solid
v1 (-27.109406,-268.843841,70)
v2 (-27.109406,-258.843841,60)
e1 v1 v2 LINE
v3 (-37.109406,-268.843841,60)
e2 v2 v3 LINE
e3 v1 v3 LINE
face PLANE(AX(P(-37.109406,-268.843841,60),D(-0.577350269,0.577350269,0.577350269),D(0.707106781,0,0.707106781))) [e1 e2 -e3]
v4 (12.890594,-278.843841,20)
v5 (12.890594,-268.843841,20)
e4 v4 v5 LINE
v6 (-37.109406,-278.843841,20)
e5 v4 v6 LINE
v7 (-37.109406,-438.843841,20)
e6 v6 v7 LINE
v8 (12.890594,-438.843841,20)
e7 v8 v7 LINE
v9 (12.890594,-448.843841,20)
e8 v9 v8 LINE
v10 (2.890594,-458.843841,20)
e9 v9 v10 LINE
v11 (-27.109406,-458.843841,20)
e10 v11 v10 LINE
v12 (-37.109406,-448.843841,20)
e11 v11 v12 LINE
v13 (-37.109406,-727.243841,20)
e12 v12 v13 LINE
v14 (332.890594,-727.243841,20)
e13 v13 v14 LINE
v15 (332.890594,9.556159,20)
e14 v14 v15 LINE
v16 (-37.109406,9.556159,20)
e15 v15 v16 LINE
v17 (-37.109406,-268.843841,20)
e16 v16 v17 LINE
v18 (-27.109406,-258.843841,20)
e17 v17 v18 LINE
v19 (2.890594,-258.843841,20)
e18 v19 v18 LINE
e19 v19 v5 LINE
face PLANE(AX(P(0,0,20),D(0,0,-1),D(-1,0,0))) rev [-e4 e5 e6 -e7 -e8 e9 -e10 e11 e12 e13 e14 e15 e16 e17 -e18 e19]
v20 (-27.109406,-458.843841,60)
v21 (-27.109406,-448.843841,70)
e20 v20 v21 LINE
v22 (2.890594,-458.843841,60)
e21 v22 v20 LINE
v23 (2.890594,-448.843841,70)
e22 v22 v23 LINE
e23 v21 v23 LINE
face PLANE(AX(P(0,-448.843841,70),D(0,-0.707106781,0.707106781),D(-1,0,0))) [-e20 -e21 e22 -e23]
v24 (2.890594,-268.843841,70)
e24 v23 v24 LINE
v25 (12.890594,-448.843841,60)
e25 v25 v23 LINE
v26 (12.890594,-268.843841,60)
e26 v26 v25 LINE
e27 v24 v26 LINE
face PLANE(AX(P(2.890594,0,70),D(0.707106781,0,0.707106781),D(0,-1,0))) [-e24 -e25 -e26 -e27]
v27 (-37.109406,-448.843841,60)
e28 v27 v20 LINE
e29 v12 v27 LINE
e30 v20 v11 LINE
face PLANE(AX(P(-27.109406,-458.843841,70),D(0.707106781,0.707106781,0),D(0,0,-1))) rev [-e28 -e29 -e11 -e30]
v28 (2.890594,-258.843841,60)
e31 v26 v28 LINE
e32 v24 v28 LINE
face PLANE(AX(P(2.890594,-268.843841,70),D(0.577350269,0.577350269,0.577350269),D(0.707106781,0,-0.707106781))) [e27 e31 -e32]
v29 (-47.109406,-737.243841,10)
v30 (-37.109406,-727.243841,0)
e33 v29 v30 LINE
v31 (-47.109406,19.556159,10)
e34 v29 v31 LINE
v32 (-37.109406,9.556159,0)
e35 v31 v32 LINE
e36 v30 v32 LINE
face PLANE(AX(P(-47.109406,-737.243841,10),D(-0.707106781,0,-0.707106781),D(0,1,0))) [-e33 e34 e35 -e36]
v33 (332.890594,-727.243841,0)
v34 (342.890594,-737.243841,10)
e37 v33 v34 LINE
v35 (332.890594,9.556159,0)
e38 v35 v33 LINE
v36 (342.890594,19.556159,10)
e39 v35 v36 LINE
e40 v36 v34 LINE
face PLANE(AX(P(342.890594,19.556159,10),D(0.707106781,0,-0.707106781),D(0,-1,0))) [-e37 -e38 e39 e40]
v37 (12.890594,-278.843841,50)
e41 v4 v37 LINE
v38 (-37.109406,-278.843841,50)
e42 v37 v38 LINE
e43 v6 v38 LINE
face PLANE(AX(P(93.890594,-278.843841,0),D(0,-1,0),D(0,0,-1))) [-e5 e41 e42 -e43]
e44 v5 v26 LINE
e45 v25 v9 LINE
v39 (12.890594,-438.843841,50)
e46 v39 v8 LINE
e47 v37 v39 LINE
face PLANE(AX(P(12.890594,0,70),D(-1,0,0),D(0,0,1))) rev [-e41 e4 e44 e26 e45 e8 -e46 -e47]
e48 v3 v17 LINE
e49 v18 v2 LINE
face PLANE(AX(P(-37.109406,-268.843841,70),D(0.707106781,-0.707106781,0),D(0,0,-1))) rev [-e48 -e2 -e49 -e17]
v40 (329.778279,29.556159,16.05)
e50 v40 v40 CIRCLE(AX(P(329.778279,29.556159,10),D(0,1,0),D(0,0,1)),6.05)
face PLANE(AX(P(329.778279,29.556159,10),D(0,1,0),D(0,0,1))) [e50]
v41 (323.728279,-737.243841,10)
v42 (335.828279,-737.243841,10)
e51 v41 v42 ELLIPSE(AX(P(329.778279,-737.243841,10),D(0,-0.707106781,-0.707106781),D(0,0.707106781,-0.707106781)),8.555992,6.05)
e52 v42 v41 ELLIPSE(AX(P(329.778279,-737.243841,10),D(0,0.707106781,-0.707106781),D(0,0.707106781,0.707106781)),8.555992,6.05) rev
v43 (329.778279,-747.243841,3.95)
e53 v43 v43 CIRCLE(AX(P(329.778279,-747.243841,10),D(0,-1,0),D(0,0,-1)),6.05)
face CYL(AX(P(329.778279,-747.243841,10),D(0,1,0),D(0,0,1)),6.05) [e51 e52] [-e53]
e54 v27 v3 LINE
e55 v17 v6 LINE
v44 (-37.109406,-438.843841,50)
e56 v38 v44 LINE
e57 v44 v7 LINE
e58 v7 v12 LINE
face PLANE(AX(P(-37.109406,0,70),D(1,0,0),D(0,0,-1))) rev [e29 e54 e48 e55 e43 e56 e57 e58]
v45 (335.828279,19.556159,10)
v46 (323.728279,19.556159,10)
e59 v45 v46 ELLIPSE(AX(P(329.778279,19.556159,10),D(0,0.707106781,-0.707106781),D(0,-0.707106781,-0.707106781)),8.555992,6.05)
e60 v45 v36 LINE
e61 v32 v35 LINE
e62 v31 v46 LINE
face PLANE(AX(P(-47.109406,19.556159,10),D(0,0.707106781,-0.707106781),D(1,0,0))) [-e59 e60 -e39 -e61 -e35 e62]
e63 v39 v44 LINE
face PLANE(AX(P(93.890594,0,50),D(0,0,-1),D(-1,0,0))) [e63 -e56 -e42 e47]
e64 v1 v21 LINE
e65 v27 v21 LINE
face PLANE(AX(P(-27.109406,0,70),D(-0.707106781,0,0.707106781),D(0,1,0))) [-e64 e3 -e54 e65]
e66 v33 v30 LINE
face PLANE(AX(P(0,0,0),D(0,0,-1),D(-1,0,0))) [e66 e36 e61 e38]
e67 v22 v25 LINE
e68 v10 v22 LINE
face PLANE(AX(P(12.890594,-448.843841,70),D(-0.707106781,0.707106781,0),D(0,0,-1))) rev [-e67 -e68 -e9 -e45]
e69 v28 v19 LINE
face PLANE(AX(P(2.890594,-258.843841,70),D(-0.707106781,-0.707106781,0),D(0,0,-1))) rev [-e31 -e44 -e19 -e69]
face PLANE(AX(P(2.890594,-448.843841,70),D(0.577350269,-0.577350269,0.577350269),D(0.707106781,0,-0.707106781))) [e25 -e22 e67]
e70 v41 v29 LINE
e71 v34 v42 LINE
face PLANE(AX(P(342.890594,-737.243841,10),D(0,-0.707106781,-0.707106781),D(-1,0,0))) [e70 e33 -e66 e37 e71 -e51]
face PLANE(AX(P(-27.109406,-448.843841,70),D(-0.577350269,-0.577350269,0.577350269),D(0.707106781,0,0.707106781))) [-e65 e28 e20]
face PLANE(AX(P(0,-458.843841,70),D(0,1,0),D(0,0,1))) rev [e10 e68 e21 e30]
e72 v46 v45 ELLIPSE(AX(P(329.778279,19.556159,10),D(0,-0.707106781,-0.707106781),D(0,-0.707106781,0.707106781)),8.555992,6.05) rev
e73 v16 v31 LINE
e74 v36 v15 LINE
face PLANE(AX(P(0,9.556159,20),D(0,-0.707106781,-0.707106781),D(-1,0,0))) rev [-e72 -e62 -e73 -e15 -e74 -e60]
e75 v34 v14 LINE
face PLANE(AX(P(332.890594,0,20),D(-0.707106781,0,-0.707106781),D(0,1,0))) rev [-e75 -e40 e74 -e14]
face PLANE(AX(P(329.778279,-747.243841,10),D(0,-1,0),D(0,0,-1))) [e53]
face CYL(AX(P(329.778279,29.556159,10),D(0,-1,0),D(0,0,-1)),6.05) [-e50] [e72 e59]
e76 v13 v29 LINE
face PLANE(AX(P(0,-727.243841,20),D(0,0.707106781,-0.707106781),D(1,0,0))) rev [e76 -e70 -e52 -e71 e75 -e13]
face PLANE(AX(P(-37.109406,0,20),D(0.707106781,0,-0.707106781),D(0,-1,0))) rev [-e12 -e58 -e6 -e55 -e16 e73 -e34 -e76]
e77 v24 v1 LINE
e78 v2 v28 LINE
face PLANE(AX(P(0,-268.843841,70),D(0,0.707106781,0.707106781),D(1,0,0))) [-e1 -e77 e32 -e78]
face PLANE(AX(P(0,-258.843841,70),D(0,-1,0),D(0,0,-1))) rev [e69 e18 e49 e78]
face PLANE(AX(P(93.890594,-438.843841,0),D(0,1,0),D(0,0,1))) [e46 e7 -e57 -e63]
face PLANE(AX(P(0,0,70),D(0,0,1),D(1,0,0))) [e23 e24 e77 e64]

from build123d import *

# Parameters (mm, degrees)
SKETCH1_W           = 390
SKETCH1_H           = 756.8
BOSS_EXTRUDE1_DEPTH = 20
SKETCH2_R           = 6.05
BOSS_EXTRUDE2_DEPTH = 10
BOSS_EXTRUDE3_START = 10
SKETCH3_R           = 6.05
BOSS_EXTRUDE3_DEPTH = 10
CHAMFER1_SIZE       = 10
BOSS_EXTRUDE4_DEPTH = 50
SKETCH5_W           = 30
SKETCH5_H           = 160
CUT_EXTRUDE1_DEPTH  = 131
CHAMFER2_SIZE       = 10


with BuildPart() as part:
    # Sketch1 → Boss-Extrude1 (new body)
    with BuildSketch(Plane.XY):
        with Locations((147.890593688, -358.84384058)):
            Rectangle(SKETCH1_W, SKETCH1_H)
    extrude(amount=BOSS_EXTRUDE1_DEPTH)

    # Sketch2 → Boss-Extrude2 (add)
    with BuildSketch(Plane(origin=(0, 19.55615942, 0), x_dir=(1, 0, 0), z_dir=(0, 1, 0))):
        with Locations(Location((329.77827945, -10, 0), (0, 0, 90))):
            Circle(SKETCH2_R)
    extrude(amount=BOSS_EXTRUDE2_DEPTH)

    # Sketch3 → Boss-Extrude3 (add)
    with BuildSketch(Plane.XZ.offset(737.24384058).offset(BOSS_EXTRUDE3_START)):
        with Locations(Location((329.77827945, 10, 0), (0, 0, 270))):
            Circle(SKETCH3_R)
    extrude(amount=-BOSS_EXTRUDE3_DEPTH)

    # Chamfer1
    # the kernel refuses this chamfer: 10 mm, written as the material it takes off along each edge
    with BuildSketch(Plane(origin=(368.607423567, -737.24384058, 0), x_dir=(0, 0.9996219169112968, -0.027495876610586487), z_dir=(-1, 0, 0))) as chamfer1_piece_1_section:
        Polygon((CHAMFER1_SIZE * 0.999621916911, -CHAMFER1_SIZE * 0.0274958766106), (-CHAMFER1_SIZE * 0.0274958766106, -CHAMFER1_SIZE * 0.999621916911), (0, 0), align=None)
    chamfer1_piece_1 = extrude(amount=441.433659759, mode=Mode.PRIVATE)
    chamfer1_piece_1 = chamfer1_piece_1 - Plane(origin=(329.77827945, -733.933944157, 10), x_dir=(0, 0, -1), z_dir=(0, -1, 0)) * Cylinder(6.05, 923, mode=Mode.PRIVATE)
    add(chamfer1_piece_1, mode=Mode.SUBTRACT)
    with BuildSketch(Plane(origin=(-47.109406312, -762.960670459, 0), x_dir=(-0.027495876610586317, 0, 0.9996219169112968), z_dir=(0, 1, 0)), Plane(origin=(342.890593688, 45.2729893, 20), x_dir=(-0.9996219169112968, 0, 0.027495876610586282), z_dir=(0, -1, 0))) as chamfer1_piece_2:
        Polygon((CHAMFER1_SIZE * 0.999621916911, CHAMFER1_SIZE * 0.0274958766106), (-CHAMFER1_SIZE * 0.0274958766106, CHAMFER1_SIZE * 0.999621916911), (0, 0), align=None)
    extrude(amount=808.233659759, mode=Mode.SUBTRACT)
    with BuildSketch(Plane(origin=(-72.826236192, 19.55615942, 0), x_dir=(0, 0.027495876610586317, 0.9996219169112968), z_dir=(1, 0, 0))) as chamfer1_piece_3_section:
        Polygon((CHAMFER1_SIZE * 0.999621916911, CHAMFER1_SIZE * 0.0274958766106), (-CHAMFER1_SIZE * 0.0274958766106, CHAMFER1_SIZE * 0.999621916911), (0, 0), align=None)
    chamfer1_piece_3 = extrude(amount=441.433659759, mode=Mode.PRIVATE)
    chamfer1_piece_3 = chamfer1_piece_3 - Plane(origin=(329.77827945, 16.24626296, 10), x_dir=(0, 0, -1), z_dir=(0, -1, 0)) * Cylinder(6.05, 923, mode=Mode.PRIVATE)
    add(chamfer1_piece_3, mode=Mode.SUBTRACT)
    with BuildSketch(Plane(origin=(342.890593688, 45.2729893, 0), x_dir=(-0.9996219169112968, 0, -0.027495876610586334), z_dir=(0, -1, 0)), Plane(origin=(-47.109406312, -762.960670459, 20), x_dir=(-0.027495876610586317, 0, -0.9996219169112968), z_dir=(0, 1, 0))) as chamfer1_piece_4:
        Polygon((CHAMFER1_SIZE * 0.999621916911, -CHAMFER1_SIZE * 0.0274958766106), (-CHAMFER1_SIZE * 0.0274958766106, -CHAMFER1_SIZE * 0.999621916911), (0, 0), align=None)
    extrude(amount=808.233659759, mode=Mode.SUBTRACT)
    with BuildSketch(Plane(origin=(368.607423567, -737.24384058, 20), x_dir=(0, 0.9996219169112968, 0.02749587661058643), z_dir=(-1, 0, 0))) as chamfer1_piece_5_section:
        Polygon((CHAMFER1_SIZE * 0.999621916911, CHAMFER1_SIZE * 0.0274958766106), (-CHAMFER1_SIZE * 0.0274958766106, CHAMFER1_SIZE * 0.999621916911), (0, 0), align=None)
    chamfer1_piece_5 = extrude(amount=441.433659759, mode=Mode.PRIVATE)
    chamfer1_piece_5 = chamfer1_piece_5 - Plane(origin=(329.77827945, -733.933944133, 10), x_dir=(0, 0, -1), z_dir=(0, -1, 0)) * Cylinder(6.05, 923, mode=Mode.PRIVATE)
    add(chamfer1_piece_5, mode=Mode.SUBTRACT)
    with BuildSketch(Plane(origin=(-72.826236192, 19.55615942, 20), x_dir=(0, 0.027495876610586317, -0.9996219169112968), z_dir=(1, 0, 0))) as chamfer1_piece_6_section:
        Polygon((CHAMFER1_SIZE * 0.999621916911, -CHAMFER1_SIZE * 0.0274958766106), (-CHAMFER1_SIZE * 0.0274958766106, -CHAMFER1_SIZE * 0.999621916911), (0, 0), align=None)
    chamfer1_piece_6 = extrude(amount=441.433659759, mode=Mode.PRIVATE)
    chamfer1_piece_6 = chamfer1_piece_6 - Plane(origin=(329.77827945, 16.246262993, 10), x_dir=(0, 0, -1), z_dir=(0, -1, 0)) * Cylinder(6.05, 923, mode=Mode.PRIVATE)
    add(chamfer1_piece_6, mode=Mode.SUBTRACT)

    # Sketch4 → Boss-Extrude4 (add)
    with BuildSketch(Plane.XY.offset(20)):
        Polygon((12.890593688, -358.84384058), (12.890593688, -258.84384058), (-37.109406312, -258.84384058), (-37.109406312, -458.84384058), (12.890593688, -458.84384058), align=None)
    extrude(amount=BOSS_EXTRUDE4_DEPTH)

    # Sketch5 → Cut-Extrude1 (cut)
    with BuildSketch(Plane.ZY.offset(37.109406312)):
        with Locations((35, -358.84384058)):
            Rectangle(SKETCH5_W, SKETCH5_H)
    extrude(amount=-CUT_EXTRUDE1_DEPTH, mode=Mode.SUBTRACT)

    # Chamfer2
    chamfer2_edges = [part.edges().sort_by_distance(p)[0] for p in [
        (-37.109406312, -458.84384058, 45),
        (12.890593688, -458.84384058, 45),
        (12.890593688, -258.84384058, 45),
        (-37.109406312, -258.84384058, 45),
        (-12.109406312, -458.84384058, 70),
        (12.890593688, -358.84384058, 70),
        (-12.109406312, -258.84384058, 70),
        (-37.109406312, -358.84384058, 70),
    ]]
    chamfer(chamfer2_edges, length=CHAMFER2_SIZE)


solid = part.part
